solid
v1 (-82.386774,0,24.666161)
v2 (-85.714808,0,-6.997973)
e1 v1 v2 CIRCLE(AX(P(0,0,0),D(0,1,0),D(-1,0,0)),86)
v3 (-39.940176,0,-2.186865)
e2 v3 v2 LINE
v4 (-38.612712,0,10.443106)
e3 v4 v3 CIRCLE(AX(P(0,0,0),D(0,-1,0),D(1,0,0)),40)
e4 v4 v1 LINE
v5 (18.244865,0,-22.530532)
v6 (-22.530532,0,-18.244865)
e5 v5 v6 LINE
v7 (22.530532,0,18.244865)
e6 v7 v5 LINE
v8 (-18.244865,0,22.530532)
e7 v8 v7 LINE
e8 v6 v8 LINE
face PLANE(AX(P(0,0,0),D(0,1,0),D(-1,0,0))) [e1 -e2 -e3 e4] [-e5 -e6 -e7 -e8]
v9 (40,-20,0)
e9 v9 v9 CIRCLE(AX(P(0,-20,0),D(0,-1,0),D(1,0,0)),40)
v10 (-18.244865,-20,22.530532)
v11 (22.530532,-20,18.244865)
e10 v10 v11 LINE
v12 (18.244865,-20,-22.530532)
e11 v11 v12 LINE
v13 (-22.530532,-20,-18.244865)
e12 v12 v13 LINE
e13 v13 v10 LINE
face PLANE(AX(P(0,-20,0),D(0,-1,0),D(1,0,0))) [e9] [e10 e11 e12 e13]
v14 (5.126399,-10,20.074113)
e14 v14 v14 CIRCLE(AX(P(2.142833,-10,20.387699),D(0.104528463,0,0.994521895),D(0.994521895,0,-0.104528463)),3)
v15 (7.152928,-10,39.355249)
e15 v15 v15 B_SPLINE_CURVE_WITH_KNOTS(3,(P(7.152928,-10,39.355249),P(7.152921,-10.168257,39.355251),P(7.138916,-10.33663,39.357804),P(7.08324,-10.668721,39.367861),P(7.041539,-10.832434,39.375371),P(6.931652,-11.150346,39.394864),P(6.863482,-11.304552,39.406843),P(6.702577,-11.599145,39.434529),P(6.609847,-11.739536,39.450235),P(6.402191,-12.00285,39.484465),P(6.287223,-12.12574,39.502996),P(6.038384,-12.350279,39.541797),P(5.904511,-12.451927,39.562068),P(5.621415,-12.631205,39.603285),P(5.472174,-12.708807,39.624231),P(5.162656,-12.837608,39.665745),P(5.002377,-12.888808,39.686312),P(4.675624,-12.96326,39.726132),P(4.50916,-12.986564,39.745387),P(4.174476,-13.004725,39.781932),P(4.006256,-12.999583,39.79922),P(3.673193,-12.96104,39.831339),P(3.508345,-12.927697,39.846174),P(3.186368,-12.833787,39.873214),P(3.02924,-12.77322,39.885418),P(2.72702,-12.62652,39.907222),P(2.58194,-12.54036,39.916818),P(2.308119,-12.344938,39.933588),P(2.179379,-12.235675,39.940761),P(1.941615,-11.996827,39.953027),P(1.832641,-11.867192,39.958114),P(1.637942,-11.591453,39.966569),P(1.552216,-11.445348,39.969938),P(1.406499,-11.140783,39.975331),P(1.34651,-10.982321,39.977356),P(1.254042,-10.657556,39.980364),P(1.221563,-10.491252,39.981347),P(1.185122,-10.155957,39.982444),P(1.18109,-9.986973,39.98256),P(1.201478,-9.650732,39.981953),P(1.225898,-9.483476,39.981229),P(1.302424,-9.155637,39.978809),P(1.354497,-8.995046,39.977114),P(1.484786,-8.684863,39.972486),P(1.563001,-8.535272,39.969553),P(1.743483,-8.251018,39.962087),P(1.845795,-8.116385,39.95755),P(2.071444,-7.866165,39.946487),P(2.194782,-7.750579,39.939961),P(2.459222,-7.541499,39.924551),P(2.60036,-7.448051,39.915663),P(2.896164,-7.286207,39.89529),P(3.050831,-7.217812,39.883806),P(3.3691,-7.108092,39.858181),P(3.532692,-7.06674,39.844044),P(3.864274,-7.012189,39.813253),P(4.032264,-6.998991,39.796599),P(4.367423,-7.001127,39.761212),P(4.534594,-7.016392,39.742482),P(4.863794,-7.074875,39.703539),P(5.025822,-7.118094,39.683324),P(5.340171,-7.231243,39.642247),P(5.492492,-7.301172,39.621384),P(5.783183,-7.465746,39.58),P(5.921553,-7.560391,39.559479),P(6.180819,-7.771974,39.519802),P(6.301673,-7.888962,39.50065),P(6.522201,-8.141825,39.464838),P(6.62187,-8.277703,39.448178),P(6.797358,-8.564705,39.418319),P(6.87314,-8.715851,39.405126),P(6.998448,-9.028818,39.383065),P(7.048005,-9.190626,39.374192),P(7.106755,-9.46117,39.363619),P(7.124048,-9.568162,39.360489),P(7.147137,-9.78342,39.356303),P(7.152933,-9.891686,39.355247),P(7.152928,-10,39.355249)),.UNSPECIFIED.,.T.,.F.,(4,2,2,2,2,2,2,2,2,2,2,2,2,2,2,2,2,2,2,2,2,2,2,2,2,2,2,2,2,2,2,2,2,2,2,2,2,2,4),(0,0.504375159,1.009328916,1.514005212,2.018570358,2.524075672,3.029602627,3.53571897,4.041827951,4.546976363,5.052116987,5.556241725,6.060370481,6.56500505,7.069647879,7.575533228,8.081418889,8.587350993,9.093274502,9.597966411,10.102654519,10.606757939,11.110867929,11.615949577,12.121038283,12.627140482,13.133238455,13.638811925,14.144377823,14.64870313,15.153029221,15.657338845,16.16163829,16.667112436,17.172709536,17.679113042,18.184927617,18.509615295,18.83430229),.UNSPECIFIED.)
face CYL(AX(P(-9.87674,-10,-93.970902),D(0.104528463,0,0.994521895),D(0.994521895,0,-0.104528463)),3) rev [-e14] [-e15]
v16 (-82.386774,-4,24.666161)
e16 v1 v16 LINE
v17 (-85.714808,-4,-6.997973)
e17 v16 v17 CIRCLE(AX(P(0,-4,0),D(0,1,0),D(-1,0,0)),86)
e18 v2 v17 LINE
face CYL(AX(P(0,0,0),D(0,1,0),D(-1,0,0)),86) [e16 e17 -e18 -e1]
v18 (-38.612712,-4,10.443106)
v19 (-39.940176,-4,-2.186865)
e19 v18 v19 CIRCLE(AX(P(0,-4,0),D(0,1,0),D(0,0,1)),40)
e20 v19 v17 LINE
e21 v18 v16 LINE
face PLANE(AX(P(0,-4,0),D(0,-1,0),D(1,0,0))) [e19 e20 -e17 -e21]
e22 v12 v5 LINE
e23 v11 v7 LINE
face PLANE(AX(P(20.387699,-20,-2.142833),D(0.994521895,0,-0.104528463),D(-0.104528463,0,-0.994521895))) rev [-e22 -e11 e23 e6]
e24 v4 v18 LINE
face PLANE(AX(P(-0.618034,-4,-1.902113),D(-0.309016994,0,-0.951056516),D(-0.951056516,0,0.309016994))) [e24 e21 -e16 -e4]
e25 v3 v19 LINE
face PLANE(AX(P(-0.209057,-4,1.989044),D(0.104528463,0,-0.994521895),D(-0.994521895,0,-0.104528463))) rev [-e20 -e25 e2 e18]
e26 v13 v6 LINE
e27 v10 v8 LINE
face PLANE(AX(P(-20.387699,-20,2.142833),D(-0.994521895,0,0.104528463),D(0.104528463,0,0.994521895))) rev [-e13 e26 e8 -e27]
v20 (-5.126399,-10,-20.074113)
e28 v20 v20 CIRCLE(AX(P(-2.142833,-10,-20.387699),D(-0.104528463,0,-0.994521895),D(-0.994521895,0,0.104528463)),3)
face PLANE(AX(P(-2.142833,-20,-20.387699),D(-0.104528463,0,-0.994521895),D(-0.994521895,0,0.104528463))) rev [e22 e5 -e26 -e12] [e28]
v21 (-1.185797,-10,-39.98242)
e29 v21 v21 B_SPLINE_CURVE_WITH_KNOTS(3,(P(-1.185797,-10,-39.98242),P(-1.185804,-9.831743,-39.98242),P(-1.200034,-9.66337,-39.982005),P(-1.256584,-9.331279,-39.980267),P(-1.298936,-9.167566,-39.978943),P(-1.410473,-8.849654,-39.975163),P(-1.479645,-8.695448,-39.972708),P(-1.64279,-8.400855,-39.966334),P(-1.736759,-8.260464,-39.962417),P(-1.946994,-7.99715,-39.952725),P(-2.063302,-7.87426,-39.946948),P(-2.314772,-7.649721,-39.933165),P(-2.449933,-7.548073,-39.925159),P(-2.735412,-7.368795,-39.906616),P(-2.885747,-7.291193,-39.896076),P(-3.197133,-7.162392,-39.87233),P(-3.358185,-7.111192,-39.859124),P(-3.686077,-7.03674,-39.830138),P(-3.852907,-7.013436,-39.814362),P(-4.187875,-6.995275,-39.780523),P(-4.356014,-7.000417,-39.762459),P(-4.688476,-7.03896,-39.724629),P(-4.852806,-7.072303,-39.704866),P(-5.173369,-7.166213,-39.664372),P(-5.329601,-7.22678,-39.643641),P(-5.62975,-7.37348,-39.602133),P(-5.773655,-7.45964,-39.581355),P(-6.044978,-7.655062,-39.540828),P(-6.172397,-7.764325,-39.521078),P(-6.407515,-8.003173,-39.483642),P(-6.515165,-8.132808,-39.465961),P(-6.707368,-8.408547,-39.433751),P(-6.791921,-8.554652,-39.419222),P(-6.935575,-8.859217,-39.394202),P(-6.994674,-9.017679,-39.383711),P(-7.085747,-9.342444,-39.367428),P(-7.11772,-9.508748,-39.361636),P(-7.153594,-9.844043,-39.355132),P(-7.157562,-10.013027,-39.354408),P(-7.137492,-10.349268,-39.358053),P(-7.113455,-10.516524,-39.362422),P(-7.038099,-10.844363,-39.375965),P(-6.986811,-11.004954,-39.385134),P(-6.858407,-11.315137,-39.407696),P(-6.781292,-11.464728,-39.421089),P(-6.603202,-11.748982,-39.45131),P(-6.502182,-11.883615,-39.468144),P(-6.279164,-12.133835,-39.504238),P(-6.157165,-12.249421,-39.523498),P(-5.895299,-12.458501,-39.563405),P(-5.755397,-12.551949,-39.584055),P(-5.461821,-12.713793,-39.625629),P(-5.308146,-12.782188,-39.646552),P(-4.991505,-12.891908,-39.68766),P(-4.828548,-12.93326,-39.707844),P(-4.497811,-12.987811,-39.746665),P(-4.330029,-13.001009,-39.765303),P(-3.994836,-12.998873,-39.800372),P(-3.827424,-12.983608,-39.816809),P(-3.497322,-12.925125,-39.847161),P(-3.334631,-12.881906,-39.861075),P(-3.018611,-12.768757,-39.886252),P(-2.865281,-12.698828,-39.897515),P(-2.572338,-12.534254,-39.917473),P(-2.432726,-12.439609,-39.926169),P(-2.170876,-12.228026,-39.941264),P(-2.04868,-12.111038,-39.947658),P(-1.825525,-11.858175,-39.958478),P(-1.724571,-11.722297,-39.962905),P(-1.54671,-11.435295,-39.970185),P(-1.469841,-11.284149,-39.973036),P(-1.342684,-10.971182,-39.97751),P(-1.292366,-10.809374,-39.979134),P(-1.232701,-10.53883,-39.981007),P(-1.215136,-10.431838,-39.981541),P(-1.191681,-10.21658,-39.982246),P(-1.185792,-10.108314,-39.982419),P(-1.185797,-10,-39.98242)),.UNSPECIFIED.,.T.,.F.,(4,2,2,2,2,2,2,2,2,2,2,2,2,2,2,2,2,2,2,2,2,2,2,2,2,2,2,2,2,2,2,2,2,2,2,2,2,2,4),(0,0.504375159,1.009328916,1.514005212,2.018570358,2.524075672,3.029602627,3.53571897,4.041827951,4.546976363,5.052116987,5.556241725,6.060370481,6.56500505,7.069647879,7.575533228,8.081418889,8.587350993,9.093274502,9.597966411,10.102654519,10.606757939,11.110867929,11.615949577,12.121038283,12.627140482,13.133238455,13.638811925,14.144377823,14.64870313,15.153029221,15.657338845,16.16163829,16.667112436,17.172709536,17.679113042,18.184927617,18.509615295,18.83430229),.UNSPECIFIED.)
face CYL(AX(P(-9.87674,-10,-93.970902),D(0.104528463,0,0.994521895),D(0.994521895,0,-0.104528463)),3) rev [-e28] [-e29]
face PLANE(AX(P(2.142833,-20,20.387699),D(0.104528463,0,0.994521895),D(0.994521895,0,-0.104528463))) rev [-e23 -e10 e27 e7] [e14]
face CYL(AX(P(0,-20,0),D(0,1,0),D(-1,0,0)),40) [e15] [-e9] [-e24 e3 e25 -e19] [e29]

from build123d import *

# Parameters (mm, degrees)
SKETCH7_W               = 86
SKETCH7_H               = 4
CUT_EXTRUDE3_DEPTH      = 122.688125961
CUT_EXTRUDE3_DEPTH_BACK = 122.688125961
SKETCH9_R               = 40
CUT_EXTRUDE4_DEPTH      = 122.688125961
SKETCH10_R              = 40
BOSS_EXTRUDE1_DEPTH     = 20
CUT_EXTRUDE7_DEPTH      = 124.255831505
CUT_EXTRUDE8_DEPTH      = 140.597641687
CUT_EXTRUDE8_DEPTH_BACK = 140.597641687
SKETCH15_R              = 3


with BuildPart() as part:
    # Sketch7 → Revolve4 (revolve)
    with BuildSketch(Plane.XY):
        with Locations((-43, -2)):
            Rectangle(SKETCH7_W, SKETCH7_H)
    revolve(axis=Axis((0, 0, 0), (0, -1, 0)))

    # Sketch9 → Cut-Extrude3 (cut, two sides: drawn at the far end of the back side and taken through both)
    with BuildSketch(Plane(origin=(0, 0, 0), x_dir=(1, 0, 0), z_dir=(0, 1, 0)).offset(-CUT_EXTRUDE3_DEPTH_BACK)):
        Circle(SKETCH9_R)
    extrude(amount=CUT_EXTRUDE3_DEPTH + CUT_EXTRUDE3_DEPTH_BACK, mode=Mode.SUBTRACT)

    # Sketch1 → Cut-Extrude4 (cut, through all)
    with BuildSketch(Plane(origin=(0, 0, 0), x_dir=(1, 0, 0), z_dir=(0, 1, 0))):
        with BuildLine():
            Line((-86.191983256, -25.902548569), (-9.566772234, -1.00550828))
            Line((-9.566772234, -1.00550828), (-89.693924294, 7.416194762))
            ThreePointArc((-89.693924294, 7.416194762), (-89.506970583, -9.407561694), (-86.191983256, -25.902548569))
        make_face()
    extrude(amount=-CUT_EXTRUDE4_DEPTH, mode=Mode.SUBTRACT)

    # Sketch10 → Boss-Extrude1 (add)
    with BuildSketch(Plane(origin=(0, 0, 0), x_dir=(-1, 0, 0), z_dir=(0, -1, 0))):
        Circle(SKETCH10_R)
    extrude(amount=BOSS_EXTRUDE1_DEPTH)

    # Sketch14 → Cut-Extrude7 (cut, through all)
    with BuildSketch(Plane(origin=(0, 0, 0), x_dir=(1, 0, 0), z_dir=(0, 1, 0))):
        Polygon((22.530532352, -18.244865358), (18.244865358, 22.530532352), (-22.530532352, 18.244865358), (-18.244865358, -22.530532352), align=None)
    extrude(amount=-CUT_EXTRUDE7_DEPTH, mode=Mode.SUBTRACT)

    # Sketch15 → Cut-Extrude8 (cut, two sides: drawn at the far end of the back side and taken through both)
    with BuildSketch(Plane(origin=(-2.142833497, 0, -20.387698855), x_dir=(0.9945218953682733, 0, -0.10452846326765386), z_dir=(0.10452846326765386, 0, 0.9945218953682733)).offset(-CUT_EXTRUDE8_DEPTH_BACK)):
        with Locations((0, -10)):
            Circle(SKETCH15_R)
    extrude(amount=CUT_EXTRUDE8_DEPTH + CUT_EXTRUDE8_DEPTH_BACK, mode=Mode.SUBTRACT)


solid = part.part
